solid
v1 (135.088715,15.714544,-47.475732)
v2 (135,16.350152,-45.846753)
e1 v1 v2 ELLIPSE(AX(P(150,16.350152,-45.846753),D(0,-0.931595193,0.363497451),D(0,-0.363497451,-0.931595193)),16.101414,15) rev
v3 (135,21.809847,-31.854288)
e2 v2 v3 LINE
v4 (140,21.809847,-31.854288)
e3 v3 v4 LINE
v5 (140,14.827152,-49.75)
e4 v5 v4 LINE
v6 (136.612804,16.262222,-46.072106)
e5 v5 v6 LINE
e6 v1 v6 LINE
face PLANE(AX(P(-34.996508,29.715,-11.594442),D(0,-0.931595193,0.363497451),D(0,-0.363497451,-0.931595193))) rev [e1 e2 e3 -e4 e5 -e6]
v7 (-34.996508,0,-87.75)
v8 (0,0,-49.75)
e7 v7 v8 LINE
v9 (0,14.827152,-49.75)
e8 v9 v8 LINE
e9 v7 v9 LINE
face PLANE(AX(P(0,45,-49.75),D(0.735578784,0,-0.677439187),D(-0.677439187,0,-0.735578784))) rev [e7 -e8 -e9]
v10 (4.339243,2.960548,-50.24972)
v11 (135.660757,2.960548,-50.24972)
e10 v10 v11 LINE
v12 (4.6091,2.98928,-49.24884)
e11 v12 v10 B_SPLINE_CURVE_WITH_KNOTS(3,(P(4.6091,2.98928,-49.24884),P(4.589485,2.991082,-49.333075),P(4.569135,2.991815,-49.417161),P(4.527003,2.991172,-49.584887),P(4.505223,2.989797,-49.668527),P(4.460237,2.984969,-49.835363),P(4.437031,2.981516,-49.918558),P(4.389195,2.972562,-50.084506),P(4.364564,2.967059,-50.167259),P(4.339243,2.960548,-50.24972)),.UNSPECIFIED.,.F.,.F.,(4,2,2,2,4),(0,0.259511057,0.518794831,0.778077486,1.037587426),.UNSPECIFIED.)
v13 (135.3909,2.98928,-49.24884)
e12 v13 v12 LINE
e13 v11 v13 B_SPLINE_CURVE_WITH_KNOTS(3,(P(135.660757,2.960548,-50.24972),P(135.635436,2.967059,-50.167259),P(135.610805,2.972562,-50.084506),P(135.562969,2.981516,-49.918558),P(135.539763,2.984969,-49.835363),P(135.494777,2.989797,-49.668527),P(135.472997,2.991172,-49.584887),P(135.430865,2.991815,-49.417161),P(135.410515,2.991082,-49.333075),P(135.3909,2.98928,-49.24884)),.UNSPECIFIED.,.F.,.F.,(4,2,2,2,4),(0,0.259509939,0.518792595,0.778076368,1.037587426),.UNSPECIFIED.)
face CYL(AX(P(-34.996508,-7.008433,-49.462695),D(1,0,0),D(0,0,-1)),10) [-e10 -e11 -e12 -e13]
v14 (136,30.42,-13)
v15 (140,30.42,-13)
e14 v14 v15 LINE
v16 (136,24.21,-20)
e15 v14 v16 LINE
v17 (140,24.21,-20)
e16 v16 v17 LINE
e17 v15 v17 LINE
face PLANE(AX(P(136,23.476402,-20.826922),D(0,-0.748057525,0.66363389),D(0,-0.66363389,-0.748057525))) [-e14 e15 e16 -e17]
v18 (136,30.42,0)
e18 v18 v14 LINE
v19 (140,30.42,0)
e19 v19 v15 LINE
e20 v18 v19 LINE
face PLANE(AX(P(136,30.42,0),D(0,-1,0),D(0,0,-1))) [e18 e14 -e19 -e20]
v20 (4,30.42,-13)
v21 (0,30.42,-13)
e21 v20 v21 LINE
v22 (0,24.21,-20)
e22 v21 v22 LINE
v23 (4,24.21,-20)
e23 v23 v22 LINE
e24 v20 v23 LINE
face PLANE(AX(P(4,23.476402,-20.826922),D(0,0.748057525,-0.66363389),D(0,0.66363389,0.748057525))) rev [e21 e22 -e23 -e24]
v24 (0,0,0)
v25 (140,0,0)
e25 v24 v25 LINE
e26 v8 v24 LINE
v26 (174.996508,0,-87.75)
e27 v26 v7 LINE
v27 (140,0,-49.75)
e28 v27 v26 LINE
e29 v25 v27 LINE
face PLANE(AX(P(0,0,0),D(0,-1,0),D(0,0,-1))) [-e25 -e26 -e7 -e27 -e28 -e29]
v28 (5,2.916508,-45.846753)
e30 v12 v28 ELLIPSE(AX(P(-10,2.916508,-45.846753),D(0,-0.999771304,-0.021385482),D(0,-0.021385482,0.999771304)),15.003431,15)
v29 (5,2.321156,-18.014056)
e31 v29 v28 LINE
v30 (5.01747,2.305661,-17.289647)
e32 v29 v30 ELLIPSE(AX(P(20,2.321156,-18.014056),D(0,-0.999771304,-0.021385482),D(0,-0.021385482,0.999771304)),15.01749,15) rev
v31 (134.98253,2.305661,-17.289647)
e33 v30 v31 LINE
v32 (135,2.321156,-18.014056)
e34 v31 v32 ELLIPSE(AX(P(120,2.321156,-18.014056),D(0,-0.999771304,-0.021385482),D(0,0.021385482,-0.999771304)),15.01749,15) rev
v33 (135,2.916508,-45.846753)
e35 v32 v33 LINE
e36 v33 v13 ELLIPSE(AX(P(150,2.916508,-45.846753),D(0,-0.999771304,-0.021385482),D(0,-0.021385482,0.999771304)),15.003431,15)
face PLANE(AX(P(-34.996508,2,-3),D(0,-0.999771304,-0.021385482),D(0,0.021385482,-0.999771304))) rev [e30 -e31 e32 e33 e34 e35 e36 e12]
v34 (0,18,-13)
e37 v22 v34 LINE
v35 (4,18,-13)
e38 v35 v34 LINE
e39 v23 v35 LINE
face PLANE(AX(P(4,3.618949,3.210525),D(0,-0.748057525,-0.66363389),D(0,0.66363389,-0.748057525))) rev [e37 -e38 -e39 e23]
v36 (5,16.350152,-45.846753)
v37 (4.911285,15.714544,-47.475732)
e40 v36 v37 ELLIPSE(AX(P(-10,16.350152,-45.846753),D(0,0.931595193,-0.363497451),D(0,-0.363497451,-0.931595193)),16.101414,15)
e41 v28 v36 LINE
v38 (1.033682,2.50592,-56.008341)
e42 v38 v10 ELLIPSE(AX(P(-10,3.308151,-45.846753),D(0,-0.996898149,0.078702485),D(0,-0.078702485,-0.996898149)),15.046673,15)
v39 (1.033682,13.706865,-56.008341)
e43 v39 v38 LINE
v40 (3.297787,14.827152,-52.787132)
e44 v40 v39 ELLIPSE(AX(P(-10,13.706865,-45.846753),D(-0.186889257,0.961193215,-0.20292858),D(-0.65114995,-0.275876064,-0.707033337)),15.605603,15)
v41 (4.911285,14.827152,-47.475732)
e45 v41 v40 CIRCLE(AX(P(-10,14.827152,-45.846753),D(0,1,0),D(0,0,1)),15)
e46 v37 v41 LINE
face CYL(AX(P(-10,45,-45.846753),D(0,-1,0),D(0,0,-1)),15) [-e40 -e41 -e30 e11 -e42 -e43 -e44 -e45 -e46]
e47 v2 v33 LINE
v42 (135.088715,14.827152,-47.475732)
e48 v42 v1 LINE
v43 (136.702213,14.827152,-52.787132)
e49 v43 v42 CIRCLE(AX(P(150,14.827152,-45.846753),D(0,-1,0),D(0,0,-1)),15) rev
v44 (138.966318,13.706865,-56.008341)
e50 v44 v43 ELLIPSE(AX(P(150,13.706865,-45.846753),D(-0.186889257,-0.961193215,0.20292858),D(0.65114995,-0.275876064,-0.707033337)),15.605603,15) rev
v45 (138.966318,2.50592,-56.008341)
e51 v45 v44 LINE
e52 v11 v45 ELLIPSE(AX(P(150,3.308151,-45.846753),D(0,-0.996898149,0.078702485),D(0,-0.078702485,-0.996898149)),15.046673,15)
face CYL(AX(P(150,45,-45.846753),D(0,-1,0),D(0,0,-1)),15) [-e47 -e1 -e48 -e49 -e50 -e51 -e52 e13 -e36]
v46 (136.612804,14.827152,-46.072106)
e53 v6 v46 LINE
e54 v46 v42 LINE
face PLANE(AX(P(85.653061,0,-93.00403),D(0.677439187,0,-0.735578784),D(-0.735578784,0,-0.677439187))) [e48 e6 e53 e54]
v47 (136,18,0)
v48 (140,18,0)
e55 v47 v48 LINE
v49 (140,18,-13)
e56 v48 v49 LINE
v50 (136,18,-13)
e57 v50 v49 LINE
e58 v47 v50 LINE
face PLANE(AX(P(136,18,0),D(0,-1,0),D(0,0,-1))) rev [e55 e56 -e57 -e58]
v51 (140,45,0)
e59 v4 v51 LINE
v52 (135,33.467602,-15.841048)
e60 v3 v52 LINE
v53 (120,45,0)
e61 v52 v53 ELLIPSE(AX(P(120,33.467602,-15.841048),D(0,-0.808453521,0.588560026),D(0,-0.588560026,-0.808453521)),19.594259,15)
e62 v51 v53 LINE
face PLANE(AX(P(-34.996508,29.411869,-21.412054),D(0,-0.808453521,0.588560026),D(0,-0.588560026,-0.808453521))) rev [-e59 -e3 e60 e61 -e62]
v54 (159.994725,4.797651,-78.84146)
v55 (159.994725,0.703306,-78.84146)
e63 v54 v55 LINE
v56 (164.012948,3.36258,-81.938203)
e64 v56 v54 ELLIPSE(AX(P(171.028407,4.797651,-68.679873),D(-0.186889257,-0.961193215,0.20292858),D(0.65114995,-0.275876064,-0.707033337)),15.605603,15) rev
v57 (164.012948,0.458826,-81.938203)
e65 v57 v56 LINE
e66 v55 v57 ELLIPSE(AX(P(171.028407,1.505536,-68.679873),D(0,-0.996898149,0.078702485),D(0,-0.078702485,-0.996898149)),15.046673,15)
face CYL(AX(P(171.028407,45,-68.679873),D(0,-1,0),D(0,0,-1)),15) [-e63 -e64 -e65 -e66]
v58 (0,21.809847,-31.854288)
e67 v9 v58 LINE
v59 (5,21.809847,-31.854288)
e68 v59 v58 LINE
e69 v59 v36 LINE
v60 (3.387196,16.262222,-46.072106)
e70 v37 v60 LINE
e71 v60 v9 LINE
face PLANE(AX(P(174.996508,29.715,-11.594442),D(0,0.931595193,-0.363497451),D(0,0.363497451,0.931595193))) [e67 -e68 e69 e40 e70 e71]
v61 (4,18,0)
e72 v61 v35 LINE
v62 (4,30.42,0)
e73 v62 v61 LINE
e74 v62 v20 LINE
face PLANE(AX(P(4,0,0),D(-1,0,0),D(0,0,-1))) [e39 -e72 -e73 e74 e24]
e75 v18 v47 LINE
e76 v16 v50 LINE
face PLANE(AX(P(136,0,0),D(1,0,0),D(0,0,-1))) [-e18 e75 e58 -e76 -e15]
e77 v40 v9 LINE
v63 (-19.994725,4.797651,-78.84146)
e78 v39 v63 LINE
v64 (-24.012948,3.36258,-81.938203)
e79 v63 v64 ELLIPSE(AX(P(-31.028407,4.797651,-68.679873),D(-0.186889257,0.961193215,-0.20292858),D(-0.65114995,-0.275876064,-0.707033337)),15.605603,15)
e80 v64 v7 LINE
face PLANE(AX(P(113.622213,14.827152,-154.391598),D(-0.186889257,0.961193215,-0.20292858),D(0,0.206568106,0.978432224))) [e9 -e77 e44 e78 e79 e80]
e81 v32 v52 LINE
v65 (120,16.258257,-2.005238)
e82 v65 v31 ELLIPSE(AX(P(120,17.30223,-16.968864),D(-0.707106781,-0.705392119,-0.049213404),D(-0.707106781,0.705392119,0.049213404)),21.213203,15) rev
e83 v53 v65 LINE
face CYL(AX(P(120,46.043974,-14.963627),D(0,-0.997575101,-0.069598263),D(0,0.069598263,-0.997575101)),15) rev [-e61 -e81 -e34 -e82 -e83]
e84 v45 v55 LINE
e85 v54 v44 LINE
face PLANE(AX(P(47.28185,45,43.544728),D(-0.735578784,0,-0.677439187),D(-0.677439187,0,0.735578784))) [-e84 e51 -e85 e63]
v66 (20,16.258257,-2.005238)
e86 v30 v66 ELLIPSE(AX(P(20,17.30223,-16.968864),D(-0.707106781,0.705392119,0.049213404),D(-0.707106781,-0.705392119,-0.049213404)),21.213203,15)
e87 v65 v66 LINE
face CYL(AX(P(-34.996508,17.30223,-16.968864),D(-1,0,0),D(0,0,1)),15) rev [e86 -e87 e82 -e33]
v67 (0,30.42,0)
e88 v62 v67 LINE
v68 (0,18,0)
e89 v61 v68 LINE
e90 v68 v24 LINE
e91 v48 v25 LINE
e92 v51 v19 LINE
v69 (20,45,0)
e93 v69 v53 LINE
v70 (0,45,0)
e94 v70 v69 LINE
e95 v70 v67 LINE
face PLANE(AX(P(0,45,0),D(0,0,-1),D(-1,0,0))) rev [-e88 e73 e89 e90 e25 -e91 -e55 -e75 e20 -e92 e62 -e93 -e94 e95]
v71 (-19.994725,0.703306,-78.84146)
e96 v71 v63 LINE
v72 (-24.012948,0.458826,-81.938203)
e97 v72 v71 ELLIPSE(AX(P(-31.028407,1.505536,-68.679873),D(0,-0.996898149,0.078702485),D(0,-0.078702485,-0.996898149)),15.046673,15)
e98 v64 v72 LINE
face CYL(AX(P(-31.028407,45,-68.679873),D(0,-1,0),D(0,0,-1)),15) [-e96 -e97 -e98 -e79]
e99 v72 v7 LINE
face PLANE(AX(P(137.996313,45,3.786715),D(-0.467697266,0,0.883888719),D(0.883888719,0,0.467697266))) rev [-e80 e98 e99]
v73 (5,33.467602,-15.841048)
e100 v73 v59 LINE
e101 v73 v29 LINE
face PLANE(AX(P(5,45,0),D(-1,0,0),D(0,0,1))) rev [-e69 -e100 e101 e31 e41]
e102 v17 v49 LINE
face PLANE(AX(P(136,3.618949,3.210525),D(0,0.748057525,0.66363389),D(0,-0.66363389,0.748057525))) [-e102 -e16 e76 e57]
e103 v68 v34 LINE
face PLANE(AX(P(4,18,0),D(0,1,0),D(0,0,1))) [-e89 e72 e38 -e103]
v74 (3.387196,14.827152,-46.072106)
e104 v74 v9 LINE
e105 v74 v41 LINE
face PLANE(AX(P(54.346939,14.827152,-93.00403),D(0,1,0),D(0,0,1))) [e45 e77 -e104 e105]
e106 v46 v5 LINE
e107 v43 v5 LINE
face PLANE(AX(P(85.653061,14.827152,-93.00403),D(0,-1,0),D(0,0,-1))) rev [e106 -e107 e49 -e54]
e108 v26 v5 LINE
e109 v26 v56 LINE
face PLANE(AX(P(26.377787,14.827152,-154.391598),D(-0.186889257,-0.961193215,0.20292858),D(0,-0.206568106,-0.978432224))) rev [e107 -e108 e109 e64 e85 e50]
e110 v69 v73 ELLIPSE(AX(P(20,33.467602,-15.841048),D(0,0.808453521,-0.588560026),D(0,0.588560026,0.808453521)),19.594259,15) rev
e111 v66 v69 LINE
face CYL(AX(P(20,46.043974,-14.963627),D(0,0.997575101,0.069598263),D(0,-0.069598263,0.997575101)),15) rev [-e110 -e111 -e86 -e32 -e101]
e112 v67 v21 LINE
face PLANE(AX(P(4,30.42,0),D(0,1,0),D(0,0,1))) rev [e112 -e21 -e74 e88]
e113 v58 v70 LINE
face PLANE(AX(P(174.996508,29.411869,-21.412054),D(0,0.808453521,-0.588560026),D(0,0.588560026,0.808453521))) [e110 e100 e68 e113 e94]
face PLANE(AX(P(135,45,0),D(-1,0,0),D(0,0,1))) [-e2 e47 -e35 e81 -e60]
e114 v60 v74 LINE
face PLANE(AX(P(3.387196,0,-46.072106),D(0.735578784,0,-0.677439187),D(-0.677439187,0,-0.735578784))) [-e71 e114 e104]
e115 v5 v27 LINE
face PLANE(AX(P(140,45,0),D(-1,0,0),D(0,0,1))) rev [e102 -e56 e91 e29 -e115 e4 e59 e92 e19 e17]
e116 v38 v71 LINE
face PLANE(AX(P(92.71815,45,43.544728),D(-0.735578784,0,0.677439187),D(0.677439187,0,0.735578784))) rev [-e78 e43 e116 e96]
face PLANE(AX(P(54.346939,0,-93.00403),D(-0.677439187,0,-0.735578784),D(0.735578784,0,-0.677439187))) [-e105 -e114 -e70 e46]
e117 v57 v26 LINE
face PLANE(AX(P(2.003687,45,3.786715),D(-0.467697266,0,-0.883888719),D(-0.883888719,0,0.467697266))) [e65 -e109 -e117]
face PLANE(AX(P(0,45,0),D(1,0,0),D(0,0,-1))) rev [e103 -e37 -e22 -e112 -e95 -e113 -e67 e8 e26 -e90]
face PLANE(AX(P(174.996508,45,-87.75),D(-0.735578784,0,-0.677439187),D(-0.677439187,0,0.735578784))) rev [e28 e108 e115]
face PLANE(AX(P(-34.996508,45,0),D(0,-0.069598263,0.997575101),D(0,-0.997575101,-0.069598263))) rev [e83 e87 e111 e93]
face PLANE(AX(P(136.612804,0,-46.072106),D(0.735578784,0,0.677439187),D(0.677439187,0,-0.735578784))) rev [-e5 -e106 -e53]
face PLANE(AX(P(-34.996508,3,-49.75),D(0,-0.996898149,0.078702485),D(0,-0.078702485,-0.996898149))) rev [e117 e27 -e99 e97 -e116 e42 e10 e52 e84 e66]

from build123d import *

# Parameters (mm, degrees)
BOSS_EXTRUDE3_DEPTH     = 45
CUT_EXTRUDE1_DEPTH      = 201.870207973
CUT_EXTRUDE1_DEPTH_BACK = 201.870207973
BOSS_EXTRUDE10_DEPTH    = 45
CUT_EXTRUDE2_DEPTH      = 201.870207973
CUT_EXTRUDE3_DEPTH      = 189.545324927
SKETCH14_W              = 5
SKETCH14_H              = 30.172848437
CUT_EXTRUDE4_DEPTH      = 5
FILLET2_R               = 15
FILLET4_R               = 10
CUT_EXTRUDE5_DEPTH      = 4


with BuildPart() as part:
    # Sketch4 → Boss-Extrude3 (new body)
    with BuildSketch(Plane(origin=(0, 0, 0), x_dir=(1, 0, 0), z_dir=(0, 1, 0))):
        Polygon((0, 49.75), (-34.996508397, 87.75), (174.996508397, 87.75), (140, 49.75), (140, 0), (0, 0), align=None)
    extrude(amount=BOSS_EXTRUDE3_DEPTH)

    # Sketch5 → Cut-Extrude1 (cut, two sides: drawn at the far end of the back side and taken through both)
    with BuildSketch(Plane(origin=(140, 0, 0), x_dir=(0, 0, -1), z_dir=(1, 0, 0)).offset(-CUT_EXTRUDE1_DEPTH_BACK)):
        Polygon((0, 45), (3, 2), (49.75, 3), (87.75, 0), (87.75, 45), align=None)
    extrude(amount=CUT_EXTRUDE1_DEPTH + CUT_EXTRUDE1_DEPTH_BACK, mode=Mode.SUBTRACT)

    # Sketch12 → Boss-Extrude10 (add)
    with BuildSketch(Plane.XZ):
        Polygon((140, 0), (135, 0), (135, -51.701623266), (161.738177617, -80.734541004), (174.996508397, -87.75), (140, -49.75), align=None)
    boss_extrude10 = extrude(amount=-BOSS_EXTRUDE10_DEPTH)

    # Sketch6 → Cut-Extrude2 (cut, symmetric)
    with BuildSketch(Plane(origin=(140, 0, 0), x_dir=(0, 0, -1), z_dir=(1, 0, 0))):
        Polygon((49.75, 45), (0, 45), (31.854288426, 21.809847033), (49.75, 14.827151563), align=None)
    cut_extrude2 = extrude(amount=CUT_EXTRUDE2_DEPTH, both=True, mode=Mode.SUBTRACT)

    # Sketch13 → Cut-Extrude3 (cut, symmetric)
    with BuildSketch(Plane(origin=(50.959743513, 0, 46.931923468), x_dir=(0.6774391869389724, 0, -0.7355787843592718), z_dir=(0.7355787843592718, 0, 0.6774391869389724))):
        Polygon((131.436530693, 14.827151563), (183.096530693, 0), (183.096530693, 45), (131.436530693, 45), align=None)
    cut_extrude3 = extrude(amount=CUT_EXTRUDE3_DEPTH, both=True, mode=Mode.SUBTRACT)

    # Sketch14 → Cut-Extrude4 (cut)
    with BuildSketch(Plane(origin=(89.040256487, 0, -96.681923468), x_dir=(-0.7355787843592717, 0, -0.6774391869389725), z_dir=(0.6774391869389725, 0, -0.7355787843592717))):
        with Locations((-66.77843026, 29.913575782)):
            Rectangle(SKETCH14_W, SKETCH14_H)
    cut_extrude4 = extrude(amount=-CUT_EXTRUDE4_DEPTH, mode=Mode.SUBTRACT)

    # Mirror1: Boss-Extrude10, Cut-Extrude2, Cut-Extrude3, Cut-Extrude4 across plane
    add(boss_extrude10.mirror(Plane(origin=(70, 0, 0), x_dir=(0, 0, 1), z_dir=(1, 0, 0))))
    add(cut_extrude2.mirror(Plane(origin=(70, 0, 0), x_dir=(0, 0, 1), z_dir=(1, 0, 0))), mode=Mode.SUBTRACT)
    add(cut_extrude3.mirror(Plane(origin=(70, 0, 0), x_dir=(0, 0, 1), z_dir=(1, 0, 0))), mode=Mode.SUBTRACT)
    add(cut_extrude4.mirror(Plane(origin=(70, 0, 0), x_dir=(0, 0, 1), z_dir=(1, 0, 0))), mode=Mode.SUBTRACT)

    # Fillet2
    # the kernel refuses this fillet: 15 mm, written as the material it adds along each edge
    with BuildSketch(Plane(origin=(5, -35.409066281, -5.609934857), x_dir=(1, 0, 0), z_dir=(0, 0.9975751008362208, 0.06959826284903867))) as fillet2_piece_1_section:
        with BuildLine():
            CenterArc((FILLET2_R, FILLET2_R), FILLET2_R, 180, 90)
            Line((0, FILLET2_R), (0, 0))
            Line((0, 0), (FILLET2_R, 0))
        make_face()
    fillet2_piece_1 = extrude(amount=118.104524125, mode=Mode.PRIVATE)
    fillet2_piece_1 = split(fillet2_piece_1, bisect_by=Plane(origin=(8.441655444, 34.86103845, -13.92700626), z_dir=(0, -0.808453521145491, 0.5885600259510132)), keep=Keep.TOP, mode=Mode.PRIVATE)
    fillet2_piece_1 = split(fillet2_piece_1, bisect_by=Plane(origin=(8.441655444, 0, -4.786685936), z_dir=(0, 1, 0)), keep=Keep.TOP, mode=Mode.PRIVATE)
    add(fillet2_piece_1)
    with BuildSketch(Plane(origin=(135, -35.409066281, -5.609934857), x_dir=(-1, 0, 0), z_dir=(0, 0.9975751008362208, 0.06959826284903867))) as fillet2_piece_2_section:
        with BuildLine():
            CenterArc((FILLET2_R, -FILLET2_R), FILLET2_R, 90, 90)
            Line((0, -FILLET2_R), (0, 0))
            Line((0, 0), (FILLET2_R, 0))
        make_face()
    fillet2_piece_2 = extrude(amount=118.104524125, mode=Mode.PRIVATE)
    fillet2_piece_2 = split(fillet2_piece_2, bisect_by=Plane(origin=(131.558344556, 34.86103845, -13.92700626), z_dir=(0, -0.808453521145491, 0.5885600259510132)), keep=Keep.TOP, mode=Mode.PRIVATE)
    fillet2_piece_2 = split(fillet2_piece_2, bisect_by=Plane(origin=(131.558344556, 0, -4.786685936), z_dir=(0, 1, 0)), keep=Keep.TOP, mode=Mode.PRIVATE)
    add(fillet2_piece_2)
    with BuildSketch(Plane(origin=(5, 2, -3), x_dir=(0, 0.9975751008362208, 0.06959826284903871), z_dir=(1, 0, 0))) as fillet2_piece_3_section:
        with BuildLine():
            CenterArc((FILLET2_R * 0.952861026227, -FILLET2_R), FILLET2_R, 90, 87.234478204)
            Line((-FILLET2_R * 0.0459743260206, -FILLET2_R * 0.951751278775), (0, 0))
            Line((0, 0), (FILLET2_R * 0.952861026227, 0))
        make_face()
    fillet2_piece_3 = extrude(amount=165.732288484, mode=Mode.PRIVATE)
    fillet2_piece_3 = split(fillet2_piece_3, bisect_by=Plane(origin=(140, 5.230522006, -5.949029167), z_dir=(-1, 0, 0)), keep=Keep.TOP, mode=Mode.PRIVATE)
    add(fillet2_piece_3)
    # the kernel refuses this fillet: 15 mm, written as the material it takes off along each edge
    with BuildSketch(Plane(origin=(-21.738177617, -5.880130796, -80.734541004), x_dir=(-0.8838887186878241, 0, -0.4676972663768696), z_dir=(0, 1, 0))) as fillet2_2_piece_1_section:
        with BuildLine():
            CenterArc((FILLET2_R * 0.171572875254, FILLET2_R), FILLET2_R, 250.528779366, 19.471220634)
            Line((-FILLET2_R * 0.16176045808, FILLET2_R * 0.0571909584179), (0, 0))
            Line((0, 0), (FILLET2_R * 0.171572875254, 0))
        make_face()
    fillet2_2_piece_1 = extrude(amount=16.37310681, mode=Mode.PRIVATE)
    fillet2_2_piece_1 = split(fillet2_2_piece_1, bisect_by=Plane(origin=(-21.810642067, 0.577757784, -80.431734736), z_dir=(0, 0.9968981486534686, -0.07870248542001068)), keep=Keep.TOP, mode=Mode.PRIVATE)
    add(fillet2_2_piece_1, mode=Mode.SUBTRACT)
    with BuildSketch(Plane(origin=(5, -11.791250012, -51.701623266), x_dir=(-0.6774391869389725, 0, -0.7355787843592716), z_dir=(0, 1, 0))) as fillet2_2_piece_2_section:
        with BuildLine():
            CenterArc((FILLET2_R * 0.390324653104, FILLET2_R), FILLET2_R, 227.356145275, 42.643854725)
            Line((-FILLET2_R * 0.287114533835, FILLET2_R * 0.264421215641), (0, 0))
            Line((0, 0), (FILLET2_R * 0.390324653104, 0))
        make_face()
    fillet2_2_piece_2 = extrude(amount=41.255576067, mode=Mode.PRIVATE)
    fillet2_2_piece_2 = split(fillet2_2_piece_2, bisect_by=Plane(origin=(4.876560205, 2.973184578, -48.496379006), z_dir=(0, 0.9997713044194101, 0.021385482447473975)), keep=Keep.TOP, mode=Mode.PRIVATE)
    add(fillet2_2_piece_2, mode=Mode.SUBTRACT)
    with BuildSketch(Plane(origin=(5, -11.791250012, -51.701623266), x_dir=(-0.6774391869389725, 0, -0.7355787843592716), z_dir=(0, 1, 0))) as fillet2_2_piece_3_section:
        with BuildLine():
            CenterArc((FILLET2_R * 0.390324653104, FILLET2_R), FILLET2_R, 227.356145275, 42.643854725)
            Line((-FILLET2_R * 0.287114533835, FILLET2_R * 0.264421215641), (0, 0))
            Line((0, 0), (FILLET2_R * 0.390324653104, 0))
        make_face()
    fillet2_2_piece_3 = extrude(amount=41.255576067, mode=Mode.PRIVATE)
    fillet2_2_piece_3 = split(fillet2_2_piece_3, bisect_by=Plane(origin=(3.697267627, 2.777037551, -52.574191023), z_dir=(0, 0.9968981486534686, -0.07870248542001068)), keep=Keep.TOP, mode=Mode.PRIVATE)
    add(fillet2_2_piece_3, mode=Mode.SUBTRACT)
    with BuildSketch(Plane(origin=(161.738177617, -5.880130796, -80.734541004), x_dir=(-0.6774391869389714, 0, 0.7355787843592727), z_dir=(0, 1, 0))) as fillet2_2_piece_4_section:
        with BuildLine():
            CenterArc((FILLET2_R * 0.171572875254, FILLET2_R), FILLET2_R, 250.528779366, 19.471220634)
            Line((-FILLET2_R * 0.16176045808, FILLET2_R * 0.0571909584179), (0, 0))
            Line((0, 0), (FILLET2_R * 0.171572875254, 0))
        make_face()
    fillet2_2_piece_4 = extrude(amount=16.37310681, mode=Mode.PRIVATE)
    fillet2_2_piece_4 = split(fillet2_2_piece_4, bisect_by=Plane(origin=(161.810642067, 0.577757784, -80.431734736), z_dir=(0, 0.9968981486534686, -0.07870248542001068)), keep=Keep.TOP, mode=Mode.PRIVATE)
    add(fillet2_2_piece_4, mode=Mode.SUBTRACT)
    with BuildSketch(Plane(origin=(135, -11.791250012, -51.701623266), x_dir=(0.6774391869389733, 0, -0.7355787843592709), z_dir=(0, 1, 0))) as fillet2_2_piece_5_section:
        with BuildLine():
            CenterArc((FILLET2_R * 0.390324653104, -FILLET2_R), FILLET2_R, 90, 42.643854725)
            Line((-FILLET2_R * 0.287114533835, -FILLET2_R * 0.264421215641), (0, 0))
            Line((0, 0), (FILLET2_R * 0.390324653104, 0))
        make_face()
    fillet2_2_piece_5 = extrude(amount=41.255576067, mode=Mode.PRIVATE)
    fillet2_2_piece_5 = split(fillet2_2_piece_5, bisect_by=Plane(origin=(135.123439795, 2.973184578, -48.496379006), z_dir=(0, 0.9997713044194101, 0.021385482447473975)), keep=Keep.TOP, mode=Mode.PRIVATE)
    add(fillet2_2_piece_5, mode=Mode.SUBTRACT)
    with BuildSketch(Plane(origin=(135, -11.791250012, -51.701623266), x_dir=(0.6774391869389733, 0, -0.7355787843592709), z_dir=(0, 1, 0))) as fillet2_2_piece_6_section:
        with BuildLine():
            CenterArc((FILLET2_R * 0.390324653104, -FILLET2_R), FILLET2_R, 90, 42.643854725)
            Line((-FILLET2_R * 0.287114533835, -FILLET2_R * 0.264421215641), (0, 0))
            Line((0, 0), (FILLET2_R * 0.390324653104, 0))
        make_face()
    fillet2_2_piece_6 = extrude(amount=41.255576067, mode=Mode.PRIVATE)
    fillet2_2_piece_6 = split(fillet2_2_piece_6, bisect_by=Plane(origin=(136.302732373, 2.777037551, -52.574191023), z_dir=(0, 0.9968981486534686, -0.07870248542001068)), keep=Keep.TOP, mode=Mode.PRIVATE)
    add(fillet2_2_piece_6, mode=Mode.SUBTRACT)

    # Fillet4
    fillet4_edges = [part.edges().sort_by_distance(p)[0] for p in [
        (70, 3, -49.75),
    ]]
    fillet(fillet4_edges, radius=FILLET4_R)

    # Sketch16 → Cut-Extrude5 (cut)
    with BuildSketch(Plane(origin=(140, 0, 0), x_dir=(0, 0, -1), z_dir=(1, 0, 0))):
        Polygon((0, 30.42), (0, 18), (13, 18), (20, 24.21), (13, 30.42), align=None)
    cut_extrude5 = extrude(amount=-CUT_EXTRUDE5_DEPTH, mode=Mode.SUBTRACT)

    # Mirror2: Cut-Extrude5 across plane
    add(cut_extrude5.mirror(Plane(origin=(70, 0, 0), x_dir=(0, 0, 1), z_dir=(1, 0, 0))), mode=Mode.SUBTRACT)


solid = part.part
